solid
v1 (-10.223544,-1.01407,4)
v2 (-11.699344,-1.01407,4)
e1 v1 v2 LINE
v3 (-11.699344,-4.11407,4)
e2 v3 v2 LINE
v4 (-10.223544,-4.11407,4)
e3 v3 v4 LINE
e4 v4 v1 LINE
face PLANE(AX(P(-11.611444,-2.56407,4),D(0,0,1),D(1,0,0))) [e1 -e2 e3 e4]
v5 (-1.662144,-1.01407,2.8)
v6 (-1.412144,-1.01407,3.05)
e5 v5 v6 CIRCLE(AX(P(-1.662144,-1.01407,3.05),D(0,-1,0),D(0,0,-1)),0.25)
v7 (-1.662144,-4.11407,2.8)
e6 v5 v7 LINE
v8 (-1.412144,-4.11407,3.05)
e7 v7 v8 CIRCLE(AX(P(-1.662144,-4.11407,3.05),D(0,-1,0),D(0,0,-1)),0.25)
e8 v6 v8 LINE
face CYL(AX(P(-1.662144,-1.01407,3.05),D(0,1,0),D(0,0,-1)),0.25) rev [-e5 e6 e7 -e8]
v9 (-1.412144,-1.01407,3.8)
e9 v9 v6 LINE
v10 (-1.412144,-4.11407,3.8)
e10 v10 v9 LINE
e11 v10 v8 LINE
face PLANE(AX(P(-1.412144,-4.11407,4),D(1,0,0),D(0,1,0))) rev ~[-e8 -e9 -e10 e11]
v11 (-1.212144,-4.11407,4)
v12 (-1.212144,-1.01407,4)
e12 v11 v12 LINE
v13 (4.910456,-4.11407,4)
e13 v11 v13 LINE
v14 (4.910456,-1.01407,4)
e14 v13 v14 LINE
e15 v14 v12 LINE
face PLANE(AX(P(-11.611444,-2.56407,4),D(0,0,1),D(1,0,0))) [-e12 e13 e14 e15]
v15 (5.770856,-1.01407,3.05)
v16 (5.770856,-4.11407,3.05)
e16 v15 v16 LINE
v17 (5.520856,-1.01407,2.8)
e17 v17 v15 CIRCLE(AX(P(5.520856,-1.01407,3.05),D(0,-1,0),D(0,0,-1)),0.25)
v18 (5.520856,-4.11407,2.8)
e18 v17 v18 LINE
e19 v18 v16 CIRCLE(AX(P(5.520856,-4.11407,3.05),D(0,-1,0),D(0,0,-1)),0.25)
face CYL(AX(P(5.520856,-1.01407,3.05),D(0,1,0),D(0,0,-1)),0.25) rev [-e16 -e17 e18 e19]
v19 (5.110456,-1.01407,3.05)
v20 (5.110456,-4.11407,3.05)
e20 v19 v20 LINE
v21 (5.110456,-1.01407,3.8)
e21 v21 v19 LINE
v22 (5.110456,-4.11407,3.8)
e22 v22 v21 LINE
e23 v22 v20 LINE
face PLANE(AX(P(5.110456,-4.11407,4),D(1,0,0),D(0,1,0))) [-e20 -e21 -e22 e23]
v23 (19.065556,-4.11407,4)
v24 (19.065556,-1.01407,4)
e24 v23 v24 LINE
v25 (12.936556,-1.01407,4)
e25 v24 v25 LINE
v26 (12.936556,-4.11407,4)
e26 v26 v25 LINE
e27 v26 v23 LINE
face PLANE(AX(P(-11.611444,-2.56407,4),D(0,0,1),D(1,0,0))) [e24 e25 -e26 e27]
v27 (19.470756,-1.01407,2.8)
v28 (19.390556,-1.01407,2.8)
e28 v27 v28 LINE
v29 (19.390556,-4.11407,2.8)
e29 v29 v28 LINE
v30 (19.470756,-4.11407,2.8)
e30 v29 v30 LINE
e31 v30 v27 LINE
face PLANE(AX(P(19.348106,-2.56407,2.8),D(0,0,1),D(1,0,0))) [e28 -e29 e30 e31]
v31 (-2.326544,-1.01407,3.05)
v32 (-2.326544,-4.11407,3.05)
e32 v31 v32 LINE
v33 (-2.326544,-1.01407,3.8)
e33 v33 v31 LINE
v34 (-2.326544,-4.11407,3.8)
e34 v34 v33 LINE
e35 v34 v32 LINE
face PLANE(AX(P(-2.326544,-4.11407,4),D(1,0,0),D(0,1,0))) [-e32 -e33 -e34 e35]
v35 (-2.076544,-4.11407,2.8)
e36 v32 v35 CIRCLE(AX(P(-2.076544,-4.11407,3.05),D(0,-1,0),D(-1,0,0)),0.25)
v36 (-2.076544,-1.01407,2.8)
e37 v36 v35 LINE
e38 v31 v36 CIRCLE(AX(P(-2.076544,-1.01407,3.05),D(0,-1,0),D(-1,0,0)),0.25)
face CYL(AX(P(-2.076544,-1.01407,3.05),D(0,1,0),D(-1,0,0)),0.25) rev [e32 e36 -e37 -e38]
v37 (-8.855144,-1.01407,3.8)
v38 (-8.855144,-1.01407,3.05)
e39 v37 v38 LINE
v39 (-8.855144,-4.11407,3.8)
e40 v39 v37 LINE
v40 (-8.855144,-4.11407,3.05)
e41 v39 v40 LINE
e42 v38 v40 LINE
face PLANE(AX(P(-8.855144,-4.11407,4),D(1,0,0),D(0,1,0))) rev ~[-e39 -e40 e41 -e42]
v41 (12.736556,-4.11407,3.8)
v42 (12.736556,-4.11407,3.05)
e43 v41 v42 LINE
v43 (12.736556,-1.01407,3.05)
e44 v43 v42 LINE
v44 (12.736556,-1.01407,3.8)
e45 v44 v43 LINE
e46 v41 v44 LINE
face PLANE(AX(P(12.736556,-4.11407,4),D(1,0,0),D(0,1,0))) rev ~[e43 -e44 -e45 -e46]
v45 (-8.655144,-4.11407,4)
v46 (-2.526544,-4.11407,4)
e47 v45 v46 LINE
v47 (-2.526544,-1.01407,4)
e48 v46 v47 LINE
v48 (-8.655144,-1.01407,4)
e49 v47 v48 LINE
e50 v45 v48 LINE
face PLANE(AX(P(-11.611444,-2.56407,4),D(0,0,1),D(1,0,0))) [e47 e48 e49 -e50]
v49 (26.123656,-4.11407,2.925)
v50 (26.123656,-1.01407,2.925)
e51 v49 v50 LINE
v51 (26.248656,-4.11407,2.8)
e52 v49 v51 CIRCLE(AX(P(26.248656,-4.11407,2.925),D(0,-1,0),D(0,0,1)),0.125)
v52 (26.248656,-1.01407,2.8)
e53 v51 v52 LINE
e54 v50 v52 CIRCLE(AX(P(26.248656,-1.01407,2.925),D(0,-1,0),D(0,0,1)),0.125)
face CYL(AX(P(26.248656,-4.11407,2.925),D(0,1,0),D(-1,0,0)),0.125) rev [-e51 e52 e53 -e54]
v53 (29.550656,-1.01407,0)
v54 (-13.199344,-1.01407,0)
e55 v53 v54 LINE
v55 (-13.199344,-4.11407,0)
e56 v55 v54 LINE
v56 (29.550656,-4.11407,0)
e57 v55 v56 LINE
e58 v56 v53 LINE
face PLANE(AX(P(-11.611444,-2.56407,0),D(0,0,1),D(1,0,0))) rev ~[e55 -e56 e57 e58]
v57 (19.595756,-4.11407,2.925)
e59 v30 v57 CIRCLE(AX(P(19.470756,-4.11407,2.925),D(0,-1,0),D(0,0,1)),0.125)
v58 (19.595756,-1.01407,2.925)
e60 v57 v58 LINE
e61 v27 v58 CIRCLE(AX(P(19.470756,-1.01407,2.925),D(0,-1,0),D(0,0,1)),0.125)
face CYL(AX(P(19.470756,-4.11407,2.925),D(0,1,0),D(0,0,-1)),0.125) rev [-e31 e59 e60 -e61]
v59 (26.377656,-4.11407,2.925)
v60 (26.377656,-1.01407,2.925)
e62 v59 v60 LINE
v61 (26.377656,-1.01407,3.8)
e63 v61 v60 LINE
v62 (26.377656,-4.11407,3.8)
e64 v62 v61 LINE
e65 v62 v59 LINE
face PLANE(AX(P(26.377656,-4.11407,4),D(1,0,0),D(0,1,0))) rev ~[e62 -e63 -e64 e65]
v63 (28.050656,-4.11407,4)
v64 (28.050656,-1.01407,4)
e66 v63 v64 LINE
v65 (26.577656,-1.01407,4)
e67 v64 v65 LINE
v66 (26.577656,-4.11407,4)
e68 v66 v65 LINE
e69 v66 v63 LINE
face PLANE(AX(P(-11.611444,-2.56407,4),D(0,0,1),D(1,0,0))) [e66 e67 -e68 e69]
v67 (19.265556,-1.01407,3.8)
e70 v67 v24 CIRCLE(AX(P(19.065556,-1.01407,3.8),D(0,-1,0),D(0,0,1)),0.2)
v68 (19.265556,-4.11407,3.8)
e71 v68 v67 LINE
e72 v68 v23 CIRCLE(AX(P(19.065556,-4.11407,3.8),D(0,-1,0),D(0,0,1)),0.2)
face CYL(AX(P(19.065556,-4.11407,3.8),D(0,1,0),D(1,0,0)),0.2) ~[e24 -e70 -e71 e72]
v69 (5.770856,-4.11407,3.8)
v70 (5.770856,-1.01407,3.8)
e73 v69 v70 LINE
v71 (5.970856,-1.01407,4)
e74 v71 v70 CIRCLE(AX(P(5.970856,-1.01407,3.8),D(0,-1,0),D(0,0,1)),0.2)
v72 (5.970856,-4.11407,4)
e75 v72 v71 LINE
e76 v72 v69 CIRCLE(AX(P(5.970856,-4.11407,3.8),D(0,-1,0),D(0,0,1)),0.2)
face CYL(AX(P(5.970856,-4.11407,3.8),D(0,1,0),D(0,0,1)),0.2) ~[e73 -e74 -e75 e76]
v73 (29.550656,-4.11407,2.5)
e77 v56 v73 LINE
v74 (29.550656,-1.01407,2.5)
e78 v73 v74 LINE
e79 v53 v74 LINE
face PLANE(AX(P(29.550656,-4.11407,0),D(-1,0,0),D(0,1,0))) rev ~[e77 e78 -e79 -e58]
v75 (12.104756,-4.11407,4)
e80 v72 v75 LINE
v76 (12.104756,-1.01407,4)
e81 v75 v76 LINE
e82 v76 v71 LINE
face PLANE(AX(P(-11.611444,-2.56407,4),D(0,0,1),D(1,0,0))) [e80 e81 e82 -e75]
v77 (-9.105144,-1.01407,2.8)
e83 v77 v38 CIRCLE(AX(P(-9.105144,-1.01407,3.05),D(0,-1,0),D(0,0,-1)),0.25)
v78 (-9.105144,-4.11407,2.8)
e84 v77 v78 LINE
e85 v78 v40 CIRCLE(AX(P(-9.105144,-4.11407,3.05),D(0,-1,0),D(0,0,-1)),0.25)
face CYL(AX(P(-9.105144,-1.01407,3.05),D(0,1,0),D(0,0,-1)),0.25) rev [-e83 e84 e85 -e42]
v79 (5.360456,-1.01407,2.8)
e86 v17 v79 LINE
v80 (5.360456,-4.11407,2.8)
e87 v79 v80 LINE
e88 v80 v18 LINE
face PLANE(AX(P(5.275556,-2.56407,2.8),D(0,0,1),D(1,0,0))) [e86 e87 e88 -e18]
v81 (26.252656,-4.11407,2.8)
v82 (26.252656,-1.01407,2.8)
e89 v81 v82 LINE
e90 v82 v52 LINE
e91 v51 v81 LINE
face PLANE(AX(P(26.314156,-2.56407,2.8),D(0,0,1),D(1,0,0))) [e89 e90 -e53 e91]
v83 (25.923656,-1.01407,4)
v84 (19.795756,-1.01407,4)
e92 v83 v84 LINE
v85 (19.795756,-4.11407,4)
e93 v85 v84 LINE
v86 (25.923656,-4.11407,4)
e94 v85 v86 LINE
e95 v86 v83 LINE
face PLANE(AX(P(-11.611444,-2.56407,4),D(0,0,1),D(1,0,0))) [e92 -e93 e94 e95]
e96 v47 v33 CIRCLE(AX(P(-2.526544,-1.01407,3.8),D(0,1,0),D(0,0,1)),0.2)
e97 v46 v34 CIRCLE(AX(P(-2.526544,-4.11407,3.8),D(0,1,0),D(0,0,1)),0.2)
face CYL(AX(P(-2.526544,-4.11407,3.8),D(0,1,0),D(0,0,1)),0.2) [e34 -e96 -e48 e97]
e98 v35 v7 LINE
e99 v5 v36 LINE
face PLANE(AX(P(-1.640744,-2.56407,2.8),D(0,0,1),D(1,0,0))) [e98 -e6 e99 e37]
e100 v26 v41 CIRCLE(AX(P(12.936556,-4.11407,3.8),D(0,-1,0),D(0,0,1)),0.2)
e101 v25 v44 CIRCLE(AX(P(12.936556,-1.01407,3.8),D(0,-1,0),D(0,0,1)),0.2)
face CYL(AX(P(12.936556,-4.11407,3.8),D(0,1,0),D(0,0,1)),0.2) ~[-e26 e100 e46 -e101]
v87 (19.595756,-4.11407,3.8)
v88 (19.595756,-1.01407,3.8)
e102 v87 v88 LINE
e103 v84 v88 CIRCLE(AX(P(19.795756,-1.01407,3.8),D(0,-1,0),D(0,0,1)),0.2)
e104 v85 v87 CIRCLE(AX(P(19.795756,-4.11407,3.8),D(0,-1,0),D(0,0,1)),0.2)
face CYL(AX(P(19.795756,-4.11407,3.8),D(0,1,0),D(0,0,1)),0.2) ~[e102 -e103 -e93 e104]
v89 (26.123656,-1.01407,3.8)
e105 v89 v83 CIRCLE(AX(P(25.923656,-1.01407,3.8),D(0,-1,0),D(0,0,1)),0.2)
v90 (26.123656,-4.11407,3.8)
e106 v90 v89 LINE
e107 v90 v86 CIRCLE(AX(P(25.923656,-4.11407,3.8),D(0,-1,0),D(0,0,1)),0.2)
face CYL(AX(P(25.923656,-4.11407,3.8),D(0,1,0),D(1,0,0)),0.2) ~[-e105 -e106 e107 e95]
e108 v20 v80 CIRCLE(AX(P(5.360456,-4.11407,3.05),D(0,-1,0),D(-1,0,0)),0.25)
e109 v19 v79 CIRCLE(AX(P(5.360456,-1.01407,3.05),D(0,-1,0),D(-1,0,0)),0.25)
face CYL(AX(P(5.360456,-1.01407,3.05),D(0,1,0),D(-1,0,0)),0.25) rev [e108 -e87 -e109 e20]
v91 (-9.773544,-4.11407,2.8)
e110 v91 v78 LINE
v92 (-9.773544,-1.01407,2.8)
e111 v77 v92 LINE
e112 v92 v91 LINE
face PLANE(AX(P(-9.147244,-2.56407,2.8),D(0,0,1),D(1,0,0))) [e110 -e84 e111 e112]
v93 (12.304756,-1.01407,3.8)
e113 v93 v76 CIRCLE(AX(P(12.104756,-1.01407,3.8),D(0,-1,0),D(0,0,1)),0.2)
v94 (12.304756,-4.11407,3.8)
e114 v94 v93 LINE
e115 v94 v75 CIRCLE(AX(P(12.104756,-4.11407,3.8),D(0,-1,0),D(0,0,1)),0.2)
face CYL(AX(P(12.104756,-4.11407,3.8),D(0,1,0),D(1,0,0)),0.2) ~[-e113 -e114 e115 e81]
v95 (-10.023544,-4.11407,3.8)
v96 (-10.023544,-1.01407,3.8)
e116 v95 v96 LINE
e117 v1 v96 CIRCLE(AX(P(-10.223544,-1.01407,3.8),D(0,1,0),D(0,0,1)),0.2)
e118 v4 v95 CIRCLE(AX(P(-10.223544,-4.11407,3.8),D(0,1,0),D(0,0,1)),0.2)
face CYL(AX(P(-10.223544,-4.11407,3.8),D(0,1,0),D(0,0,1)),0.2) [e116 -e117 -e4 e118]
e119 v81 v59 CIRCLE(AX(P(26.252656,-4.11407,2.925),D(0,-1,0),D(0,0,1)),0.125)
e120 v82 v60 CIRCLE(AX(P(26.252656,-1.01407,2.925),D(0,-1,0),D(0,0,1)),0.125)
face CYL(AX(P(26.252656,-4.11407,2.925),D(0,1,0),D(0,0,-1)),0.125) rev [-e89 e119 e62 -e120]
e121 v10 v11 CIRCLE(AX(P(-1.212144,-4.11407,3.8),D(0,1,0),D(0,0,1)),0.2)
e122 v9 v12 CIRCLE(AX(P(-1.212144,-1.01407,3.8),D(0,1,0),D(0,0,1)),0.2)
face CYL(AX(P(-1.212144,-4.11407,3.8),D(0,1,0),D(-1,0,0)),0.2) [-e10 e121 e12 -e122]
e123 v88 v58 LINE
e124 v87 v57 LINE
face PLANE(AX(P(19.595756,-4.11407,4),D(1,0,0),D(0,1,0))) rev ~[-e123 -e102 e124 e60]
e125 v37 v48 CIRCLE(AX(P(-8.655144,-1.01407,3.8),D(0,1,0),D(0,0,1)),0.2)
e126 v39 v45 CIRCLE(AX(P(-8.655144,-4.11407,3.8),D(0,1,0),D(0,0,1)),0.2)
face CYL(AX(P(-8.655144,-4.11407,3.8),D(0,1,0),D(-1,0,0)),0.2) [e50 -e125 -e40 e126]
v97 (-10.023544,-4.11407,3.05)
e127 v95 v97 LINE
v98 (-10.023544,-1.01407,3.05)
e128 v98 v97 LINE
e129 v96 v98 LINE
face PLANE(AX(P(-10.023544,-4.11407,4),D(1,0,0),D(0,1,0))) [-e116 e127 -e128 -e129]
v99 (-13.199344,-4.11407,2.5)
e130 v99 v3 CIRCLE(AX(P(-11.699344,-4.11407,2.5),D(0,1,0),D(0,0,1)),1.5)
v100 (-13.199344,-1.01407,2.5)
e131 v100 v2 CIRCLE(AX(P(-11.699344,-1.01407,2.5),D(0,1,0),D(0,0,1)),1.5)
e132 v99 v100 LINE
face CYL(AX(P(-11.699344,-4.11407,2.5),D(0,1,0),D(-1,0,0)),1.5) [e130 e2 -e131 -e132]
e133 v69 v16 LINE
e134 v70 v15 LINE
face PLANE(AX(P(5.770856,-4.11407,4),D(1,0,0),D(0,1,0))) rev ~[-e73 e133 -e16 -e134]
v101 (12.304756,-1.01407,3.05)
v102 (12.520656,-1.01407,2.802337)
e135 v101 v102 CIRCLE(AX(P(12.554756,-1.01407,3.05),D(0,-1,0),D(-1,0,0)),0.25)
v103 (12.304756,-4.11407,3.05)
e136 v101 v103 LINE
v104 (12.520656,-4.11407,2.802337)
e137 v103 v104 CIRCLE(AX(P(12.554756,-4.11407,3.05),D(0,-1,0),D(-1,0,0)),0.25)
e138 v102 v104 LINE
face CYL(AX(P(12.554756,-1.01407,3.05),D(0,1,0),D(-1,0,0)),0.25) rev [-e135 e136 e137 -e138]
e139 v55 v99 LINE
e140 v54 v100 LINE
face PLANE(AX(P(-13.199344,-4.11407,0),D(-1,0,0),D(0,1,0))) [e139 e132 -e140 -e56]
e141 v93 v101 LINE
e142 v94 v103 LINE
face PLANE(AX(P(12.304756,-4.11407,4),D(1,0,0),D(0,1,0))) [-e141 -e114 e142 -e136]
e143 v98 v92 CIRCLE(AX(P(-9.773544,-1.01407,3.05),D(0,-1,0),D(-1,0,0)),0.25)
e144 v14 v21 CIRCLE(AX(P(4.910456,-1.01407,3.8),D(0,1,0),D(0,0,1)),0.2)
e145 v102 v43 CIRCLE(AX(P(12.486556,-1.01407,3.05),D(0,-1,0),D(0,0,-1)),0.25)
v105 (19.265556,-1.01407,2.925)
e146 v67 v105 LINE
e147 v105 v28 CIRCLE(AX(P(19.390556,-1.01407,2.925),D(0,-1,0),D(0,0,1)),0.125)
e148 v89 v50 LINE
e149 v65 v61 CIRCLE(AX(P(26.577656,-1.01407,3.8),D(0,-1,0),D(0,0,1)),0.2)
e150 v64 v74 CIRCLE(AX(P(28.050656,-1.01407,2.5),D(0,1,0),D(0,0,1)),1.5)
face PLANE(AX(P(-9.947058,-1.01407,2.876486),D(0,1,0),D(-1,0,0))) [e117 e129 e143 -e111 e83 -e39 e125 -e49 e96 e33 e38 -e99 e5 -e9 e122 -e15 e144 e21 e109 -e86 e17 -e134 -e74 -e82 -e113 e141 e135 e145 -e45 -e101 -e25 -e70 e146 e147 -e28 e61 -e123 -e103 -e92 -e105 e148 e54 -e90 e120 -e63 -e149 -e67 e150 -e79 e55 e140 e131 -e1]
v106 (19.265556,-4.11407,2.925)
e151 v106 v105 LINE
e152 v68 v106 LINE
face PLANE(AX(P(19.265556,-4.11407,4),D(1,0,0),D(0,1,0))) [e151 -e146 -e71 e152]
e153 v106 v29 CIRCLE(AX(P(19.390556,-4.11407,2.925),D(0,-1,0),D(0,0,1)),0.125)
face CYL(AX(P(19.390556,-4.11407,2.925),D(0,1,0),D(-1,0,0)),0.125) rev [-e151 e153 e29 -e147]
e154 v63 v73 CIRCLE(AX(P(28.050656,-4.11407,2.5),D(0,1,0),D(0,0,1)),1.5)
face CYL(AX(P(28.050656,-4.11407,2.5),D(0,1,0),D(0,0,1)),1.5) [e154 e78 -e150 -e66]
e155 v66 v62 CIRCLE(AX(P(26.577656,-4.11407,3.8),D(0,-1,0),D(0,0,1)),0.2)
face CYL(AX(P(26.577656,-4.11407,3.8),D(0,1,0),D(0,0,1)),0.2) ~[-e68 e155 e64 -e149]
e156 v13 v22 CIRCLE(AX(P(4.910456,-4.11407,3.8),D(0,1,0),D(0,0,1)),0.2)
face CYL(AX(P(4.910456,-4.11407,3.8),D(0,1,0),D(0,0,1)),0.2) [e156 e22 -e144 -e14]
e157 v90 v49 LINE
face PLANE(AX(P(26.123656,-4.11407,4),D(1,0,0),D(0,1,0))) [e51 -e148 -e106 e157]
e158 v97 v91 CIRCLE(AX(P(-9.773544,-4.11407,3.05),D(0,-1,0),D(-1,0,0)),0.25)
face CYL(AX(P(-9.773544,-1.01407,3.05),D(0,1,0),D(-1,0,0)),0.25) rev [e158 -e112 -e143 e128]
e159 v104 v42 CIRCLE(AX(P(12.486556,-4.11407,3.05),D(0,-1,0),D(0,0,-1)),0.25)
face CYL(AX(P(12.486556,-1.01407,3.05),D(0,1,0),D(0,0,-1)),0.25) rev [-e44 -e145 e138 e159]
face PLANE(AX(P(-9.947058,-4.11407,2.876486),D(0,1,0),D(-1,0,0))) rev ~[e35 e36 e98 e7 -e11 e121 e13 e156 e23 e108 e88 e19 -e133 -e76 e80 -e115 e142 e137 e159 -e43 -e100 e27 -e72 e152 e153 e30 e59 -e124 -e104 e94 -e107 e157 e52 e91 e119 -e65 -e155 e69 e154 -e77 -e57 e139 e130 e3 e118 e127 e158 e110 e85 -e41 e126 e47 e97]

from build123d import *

# Parameters (mm, degrees)
F0_W        = 3.1758
F0_H        = 3.1
F0_W_2      = 1.1684
F0_W_3      = 6.5286
F0_W_4      = 0.9144
F0_W_5      = 6.5226
F0_W_6      = 0.6604
F0_W_7      = 6.5339
F0_W_8      = 0.4318
F0_W_9      = 6.529
F0_W_10     = 0.3302
F0_W_11     = 6.5279
F0_W_12     = 0.254
F0_W_13     = 3.173
F1_DEPTH    = 4
F2_W        = 0.5842
F2_H        = 3.1
F2_W_2      = 0.4572
F2_W_3      = 0.3302
F2_W_4      = 0.2159
F2_W_5      = 0.1651
F2_W_6      = 0.127
F3_DEPTH    = 1.2
F4_T1_DEPTH = 3.1
F5_R        = 0.125
F6_R        = 1.5
F7_R        = 0.2


# Not quite as in the source:
# - a fillet or chamfer that OpenCascade refuses, or shapes differently, is made with other operations: its cross-section is extruded or revolved along the edge and cut away or added


with BuildPart() as f1:
    # F0 (on Top) → F1 (new body)
    with BuildSketch(Plane.XY):
        with Locations((-11.6114438434, -2.5640697926)):
            Rectangle(F0_W, F0_H)
        with Locations((-9.4393438434, -2.5640697926)):
            Rectangle(F0_W_2, F0_H)
        with Locations((-5.5908438434, -2.5640697926)):
            Rectangle(F0_W_3, F0_H)
        with Locations((-1.8693438434, -2.5640697926)):
            Rectangle(F0_W_4, F0_H)
        with Locations((1.8491561566, -2.5640697926)):
            Rectangle(F0_W_5, F0_H)
        with Locations((5.4406561566, -2.5640697926)):
            Rectangle(F0_W_6, F0_H)
        with Locations((9.0378061566, -2.5640697926)):
            Rectangle(F0_W_7, F0_H)
        with Locations((12.5206561566, -2.5640697926)):
            Rectangle(F0_W_8, F0_H)
        with Locations((16.0010561566, -2.5640697926)):
            Rectangle(F0_W_9, F0_H)
        with Locations((19.4306561566, -2.5640697926)):
            Rectangle(F0_W_10, F0_H)
        with Locations((22.8597061566, -2.5640697926)):
            Rectangle(F0_W_11, F0_H)
        with Locations((26.2506561566, -2.5640697926)):
            Rectangle(F0_W_12, F0_H)
        with Locations((27.9641561566, -2.5640697926)):
            Rectangle(F0_W_13, F0_H)
    extrude(amount=F1_DEPTH)

    # F2 (on face) → F3 (cut)
    with BuildSketch(Plane.XY.offset(4)):
        with Locations((-9.1472438434, -2.5640697926)):
            Rectangle(F2_W, F2_H)
        with Locations((-9.7314438434, -2.5640697926)):
            Rectangle(F2_W, F2_H)
        with Locations((-1.6407438434, -2.5640697926)):
            Rectangle(F2_W_2, F2_H)
        with Locations((-2.0979438434, -2.5640697926)):
            Rectangle(F2_W_2, F2_H)
        with Locations((5.2755561566, -2.5640697926)):
            Rectangle(F2_W_3, F2_H)
        with Locations((5.6057561566, -2.5640697926)):
            Rectangle(F2_W_3, F2_H)
        with Locations((12.4127061566, -2.5640697926)):
            Rectangle(F2_W_4, F2_H)
        with Locations((12.6286061566, -2.5640697926)):
            Rectangle(F2_W_4, F2_H)
        with Locations((19.3481061566, -2.5640697926)):
            Rectangle(F2_W_5, F2_H)
        with Locations((19.5132061566, -2.5640697926)):
            Rectangle(F2_W_5, F2_H)
        with Locations((26.3141561566, -2.5640697926)):
            Rectangle(F2_W_6, F2_H)
        with Locations((26.1871561566, -2.5640697926)):
            Rectangle(F2_W_6, F2_H)
    extrude(amount=-F3_DEPTH, mode=Mode.SUBTRACT)

    # F4: fillet of radius 0.25 on 8 edges, made by hand

    # F4_s2 → F4_t1 (join)
    with BuildSketch(Plane.XZ.offset(1.0140697926)):
        with BuildLine():
            ThreePointArc((-10.0235438434, 3.05), (-9.9503205387, 2.8732233047), (-9.7735438434, 2.8))
            Line((-9.7735438434, 2.8), (-10.0235438434, 2.8))
            Line((-10.0235438434, 2.8), (-10.0235438434, 3.05))
        make_face()
        with BuildLine():
            ThreePointArc((-9.1051438434, 2.8), (-8.9283671481, 2.8732233047), (-8.8551438434, 3.05))
            Line((-8.8551438434, 3.05), (-8.8551438434, 2.8))
            Line((-8.8551438434, 2.8), (-9.1051438434, 2.8))
        make_face()
        with BuildLine():
            ThreePointArc((-1.6621438434, 2.8), (-1.4853671481, 2.8732233047), (-1.4121438434, 3.05))
            Line((-1.4121438434, 3.05), (-1.4121438434, 2.8))
            Line((-1.4121438434, 2.8), (-1.6621438434, 2.8))
        make_face()
        with BuildLine():
            ThreePointArc((-2.3265438434, 3.05), (-2.2533205387, 2.8732233047), (-2.0765438434, 2.8))
            Line((-2.0765438434, 2.8), (-2.3265438434, 2.8))
            Line((-2.3265438434, 2.8), (-2.3265438434, 3.05))
        make_face()
        with BuildLine():
            ThreePointArc((5.1104561566, 3.05), (5.1836794613, 2.8732233047), (5.3604561566, 2.8))
            Line((5.3604561566, 2.8), (5.1104561566, 2.8))
            Line((5.1104561566, 2.8), (5.1104561566, 3.05))
        make_face()
        with BuildLine():
            ThreePointArc((5.5208561566, 2.8), (5.6976328519, 2.8732233047), (5.7708561566, 3.05))
            Line((5.7708561566, 3.05), (5.7708561566, 2.8))
            Line((5.7708561566, 2.8), (5.5208561566, 2.8))
        make_face()
        with BuildLine():
            ThreePointArc((12.4865561566, 2.8), (12.6633328519, 2.8732233047), (12.7365561566, 3.05))
            Line((12.7365561566, 3.05), (12.7365561566, 2.8))
            Line((12.7365561566, 2.8), (12.4865561566, 2.8))
        make_face()
        with BuildLine():
            ThreePointArc((12.3047561566, 3.05), (12.3779794613, 2.8732233047), (12.5547561566, 2.8))
            Line((12.5547561566, 2.8), (12.3047561566, 2.8))
            Line((12.3047561566, 2.8), (12.3047561566, 3.05))
        make_face()
    extrude(amount=F4_T1_DEPTH)

    # F5
    f5_edges = [f1.edges().sort_by_distance(p)[0] for p in [
        (19.265556, -2.56407, 2.8),
        (19.595756, -2.56407, 2.8),
        (26.377656, -2.56407, 2.8),
        (26.123656, -2.56407, 2.8),
    ]]
    fillet(f5_edges, radius=F5_R)

    # F6
    f6_edges = [f1.edges().sort_by_distance(p)[0] for p in [
        (29.550656, -2.56407, 4),
        (-13.199344, -2.56407, 4),
    ]]
    fillet(f6_edges, radius=F6_R)

    # F7
    f7_edges = [f1.edges().sort_by_distance(p)[0] for p in [
        (-10.023544, -2.56407, 4),
        (-8.855144, -2.56407, 4),
        (-2.326544, -2.56407, 4),
        (-1.412144, -2.56407, 4),
        (5.110456, -2.56407, 4),
        (5.770856, -2.56407, 4),
        (12.304756, -2.56407, 4),
        (12.736556, -2.56407, 4),
        (19.265556, -2.56407, 4),
        (19.595756, -2.56407, 4),
        (26.123656, -2.56407, 4),
        (26.377656, -2.56407, 4),
    ]]
    fillet(f7_edges, radius=F7_R)


solid = f1.part
